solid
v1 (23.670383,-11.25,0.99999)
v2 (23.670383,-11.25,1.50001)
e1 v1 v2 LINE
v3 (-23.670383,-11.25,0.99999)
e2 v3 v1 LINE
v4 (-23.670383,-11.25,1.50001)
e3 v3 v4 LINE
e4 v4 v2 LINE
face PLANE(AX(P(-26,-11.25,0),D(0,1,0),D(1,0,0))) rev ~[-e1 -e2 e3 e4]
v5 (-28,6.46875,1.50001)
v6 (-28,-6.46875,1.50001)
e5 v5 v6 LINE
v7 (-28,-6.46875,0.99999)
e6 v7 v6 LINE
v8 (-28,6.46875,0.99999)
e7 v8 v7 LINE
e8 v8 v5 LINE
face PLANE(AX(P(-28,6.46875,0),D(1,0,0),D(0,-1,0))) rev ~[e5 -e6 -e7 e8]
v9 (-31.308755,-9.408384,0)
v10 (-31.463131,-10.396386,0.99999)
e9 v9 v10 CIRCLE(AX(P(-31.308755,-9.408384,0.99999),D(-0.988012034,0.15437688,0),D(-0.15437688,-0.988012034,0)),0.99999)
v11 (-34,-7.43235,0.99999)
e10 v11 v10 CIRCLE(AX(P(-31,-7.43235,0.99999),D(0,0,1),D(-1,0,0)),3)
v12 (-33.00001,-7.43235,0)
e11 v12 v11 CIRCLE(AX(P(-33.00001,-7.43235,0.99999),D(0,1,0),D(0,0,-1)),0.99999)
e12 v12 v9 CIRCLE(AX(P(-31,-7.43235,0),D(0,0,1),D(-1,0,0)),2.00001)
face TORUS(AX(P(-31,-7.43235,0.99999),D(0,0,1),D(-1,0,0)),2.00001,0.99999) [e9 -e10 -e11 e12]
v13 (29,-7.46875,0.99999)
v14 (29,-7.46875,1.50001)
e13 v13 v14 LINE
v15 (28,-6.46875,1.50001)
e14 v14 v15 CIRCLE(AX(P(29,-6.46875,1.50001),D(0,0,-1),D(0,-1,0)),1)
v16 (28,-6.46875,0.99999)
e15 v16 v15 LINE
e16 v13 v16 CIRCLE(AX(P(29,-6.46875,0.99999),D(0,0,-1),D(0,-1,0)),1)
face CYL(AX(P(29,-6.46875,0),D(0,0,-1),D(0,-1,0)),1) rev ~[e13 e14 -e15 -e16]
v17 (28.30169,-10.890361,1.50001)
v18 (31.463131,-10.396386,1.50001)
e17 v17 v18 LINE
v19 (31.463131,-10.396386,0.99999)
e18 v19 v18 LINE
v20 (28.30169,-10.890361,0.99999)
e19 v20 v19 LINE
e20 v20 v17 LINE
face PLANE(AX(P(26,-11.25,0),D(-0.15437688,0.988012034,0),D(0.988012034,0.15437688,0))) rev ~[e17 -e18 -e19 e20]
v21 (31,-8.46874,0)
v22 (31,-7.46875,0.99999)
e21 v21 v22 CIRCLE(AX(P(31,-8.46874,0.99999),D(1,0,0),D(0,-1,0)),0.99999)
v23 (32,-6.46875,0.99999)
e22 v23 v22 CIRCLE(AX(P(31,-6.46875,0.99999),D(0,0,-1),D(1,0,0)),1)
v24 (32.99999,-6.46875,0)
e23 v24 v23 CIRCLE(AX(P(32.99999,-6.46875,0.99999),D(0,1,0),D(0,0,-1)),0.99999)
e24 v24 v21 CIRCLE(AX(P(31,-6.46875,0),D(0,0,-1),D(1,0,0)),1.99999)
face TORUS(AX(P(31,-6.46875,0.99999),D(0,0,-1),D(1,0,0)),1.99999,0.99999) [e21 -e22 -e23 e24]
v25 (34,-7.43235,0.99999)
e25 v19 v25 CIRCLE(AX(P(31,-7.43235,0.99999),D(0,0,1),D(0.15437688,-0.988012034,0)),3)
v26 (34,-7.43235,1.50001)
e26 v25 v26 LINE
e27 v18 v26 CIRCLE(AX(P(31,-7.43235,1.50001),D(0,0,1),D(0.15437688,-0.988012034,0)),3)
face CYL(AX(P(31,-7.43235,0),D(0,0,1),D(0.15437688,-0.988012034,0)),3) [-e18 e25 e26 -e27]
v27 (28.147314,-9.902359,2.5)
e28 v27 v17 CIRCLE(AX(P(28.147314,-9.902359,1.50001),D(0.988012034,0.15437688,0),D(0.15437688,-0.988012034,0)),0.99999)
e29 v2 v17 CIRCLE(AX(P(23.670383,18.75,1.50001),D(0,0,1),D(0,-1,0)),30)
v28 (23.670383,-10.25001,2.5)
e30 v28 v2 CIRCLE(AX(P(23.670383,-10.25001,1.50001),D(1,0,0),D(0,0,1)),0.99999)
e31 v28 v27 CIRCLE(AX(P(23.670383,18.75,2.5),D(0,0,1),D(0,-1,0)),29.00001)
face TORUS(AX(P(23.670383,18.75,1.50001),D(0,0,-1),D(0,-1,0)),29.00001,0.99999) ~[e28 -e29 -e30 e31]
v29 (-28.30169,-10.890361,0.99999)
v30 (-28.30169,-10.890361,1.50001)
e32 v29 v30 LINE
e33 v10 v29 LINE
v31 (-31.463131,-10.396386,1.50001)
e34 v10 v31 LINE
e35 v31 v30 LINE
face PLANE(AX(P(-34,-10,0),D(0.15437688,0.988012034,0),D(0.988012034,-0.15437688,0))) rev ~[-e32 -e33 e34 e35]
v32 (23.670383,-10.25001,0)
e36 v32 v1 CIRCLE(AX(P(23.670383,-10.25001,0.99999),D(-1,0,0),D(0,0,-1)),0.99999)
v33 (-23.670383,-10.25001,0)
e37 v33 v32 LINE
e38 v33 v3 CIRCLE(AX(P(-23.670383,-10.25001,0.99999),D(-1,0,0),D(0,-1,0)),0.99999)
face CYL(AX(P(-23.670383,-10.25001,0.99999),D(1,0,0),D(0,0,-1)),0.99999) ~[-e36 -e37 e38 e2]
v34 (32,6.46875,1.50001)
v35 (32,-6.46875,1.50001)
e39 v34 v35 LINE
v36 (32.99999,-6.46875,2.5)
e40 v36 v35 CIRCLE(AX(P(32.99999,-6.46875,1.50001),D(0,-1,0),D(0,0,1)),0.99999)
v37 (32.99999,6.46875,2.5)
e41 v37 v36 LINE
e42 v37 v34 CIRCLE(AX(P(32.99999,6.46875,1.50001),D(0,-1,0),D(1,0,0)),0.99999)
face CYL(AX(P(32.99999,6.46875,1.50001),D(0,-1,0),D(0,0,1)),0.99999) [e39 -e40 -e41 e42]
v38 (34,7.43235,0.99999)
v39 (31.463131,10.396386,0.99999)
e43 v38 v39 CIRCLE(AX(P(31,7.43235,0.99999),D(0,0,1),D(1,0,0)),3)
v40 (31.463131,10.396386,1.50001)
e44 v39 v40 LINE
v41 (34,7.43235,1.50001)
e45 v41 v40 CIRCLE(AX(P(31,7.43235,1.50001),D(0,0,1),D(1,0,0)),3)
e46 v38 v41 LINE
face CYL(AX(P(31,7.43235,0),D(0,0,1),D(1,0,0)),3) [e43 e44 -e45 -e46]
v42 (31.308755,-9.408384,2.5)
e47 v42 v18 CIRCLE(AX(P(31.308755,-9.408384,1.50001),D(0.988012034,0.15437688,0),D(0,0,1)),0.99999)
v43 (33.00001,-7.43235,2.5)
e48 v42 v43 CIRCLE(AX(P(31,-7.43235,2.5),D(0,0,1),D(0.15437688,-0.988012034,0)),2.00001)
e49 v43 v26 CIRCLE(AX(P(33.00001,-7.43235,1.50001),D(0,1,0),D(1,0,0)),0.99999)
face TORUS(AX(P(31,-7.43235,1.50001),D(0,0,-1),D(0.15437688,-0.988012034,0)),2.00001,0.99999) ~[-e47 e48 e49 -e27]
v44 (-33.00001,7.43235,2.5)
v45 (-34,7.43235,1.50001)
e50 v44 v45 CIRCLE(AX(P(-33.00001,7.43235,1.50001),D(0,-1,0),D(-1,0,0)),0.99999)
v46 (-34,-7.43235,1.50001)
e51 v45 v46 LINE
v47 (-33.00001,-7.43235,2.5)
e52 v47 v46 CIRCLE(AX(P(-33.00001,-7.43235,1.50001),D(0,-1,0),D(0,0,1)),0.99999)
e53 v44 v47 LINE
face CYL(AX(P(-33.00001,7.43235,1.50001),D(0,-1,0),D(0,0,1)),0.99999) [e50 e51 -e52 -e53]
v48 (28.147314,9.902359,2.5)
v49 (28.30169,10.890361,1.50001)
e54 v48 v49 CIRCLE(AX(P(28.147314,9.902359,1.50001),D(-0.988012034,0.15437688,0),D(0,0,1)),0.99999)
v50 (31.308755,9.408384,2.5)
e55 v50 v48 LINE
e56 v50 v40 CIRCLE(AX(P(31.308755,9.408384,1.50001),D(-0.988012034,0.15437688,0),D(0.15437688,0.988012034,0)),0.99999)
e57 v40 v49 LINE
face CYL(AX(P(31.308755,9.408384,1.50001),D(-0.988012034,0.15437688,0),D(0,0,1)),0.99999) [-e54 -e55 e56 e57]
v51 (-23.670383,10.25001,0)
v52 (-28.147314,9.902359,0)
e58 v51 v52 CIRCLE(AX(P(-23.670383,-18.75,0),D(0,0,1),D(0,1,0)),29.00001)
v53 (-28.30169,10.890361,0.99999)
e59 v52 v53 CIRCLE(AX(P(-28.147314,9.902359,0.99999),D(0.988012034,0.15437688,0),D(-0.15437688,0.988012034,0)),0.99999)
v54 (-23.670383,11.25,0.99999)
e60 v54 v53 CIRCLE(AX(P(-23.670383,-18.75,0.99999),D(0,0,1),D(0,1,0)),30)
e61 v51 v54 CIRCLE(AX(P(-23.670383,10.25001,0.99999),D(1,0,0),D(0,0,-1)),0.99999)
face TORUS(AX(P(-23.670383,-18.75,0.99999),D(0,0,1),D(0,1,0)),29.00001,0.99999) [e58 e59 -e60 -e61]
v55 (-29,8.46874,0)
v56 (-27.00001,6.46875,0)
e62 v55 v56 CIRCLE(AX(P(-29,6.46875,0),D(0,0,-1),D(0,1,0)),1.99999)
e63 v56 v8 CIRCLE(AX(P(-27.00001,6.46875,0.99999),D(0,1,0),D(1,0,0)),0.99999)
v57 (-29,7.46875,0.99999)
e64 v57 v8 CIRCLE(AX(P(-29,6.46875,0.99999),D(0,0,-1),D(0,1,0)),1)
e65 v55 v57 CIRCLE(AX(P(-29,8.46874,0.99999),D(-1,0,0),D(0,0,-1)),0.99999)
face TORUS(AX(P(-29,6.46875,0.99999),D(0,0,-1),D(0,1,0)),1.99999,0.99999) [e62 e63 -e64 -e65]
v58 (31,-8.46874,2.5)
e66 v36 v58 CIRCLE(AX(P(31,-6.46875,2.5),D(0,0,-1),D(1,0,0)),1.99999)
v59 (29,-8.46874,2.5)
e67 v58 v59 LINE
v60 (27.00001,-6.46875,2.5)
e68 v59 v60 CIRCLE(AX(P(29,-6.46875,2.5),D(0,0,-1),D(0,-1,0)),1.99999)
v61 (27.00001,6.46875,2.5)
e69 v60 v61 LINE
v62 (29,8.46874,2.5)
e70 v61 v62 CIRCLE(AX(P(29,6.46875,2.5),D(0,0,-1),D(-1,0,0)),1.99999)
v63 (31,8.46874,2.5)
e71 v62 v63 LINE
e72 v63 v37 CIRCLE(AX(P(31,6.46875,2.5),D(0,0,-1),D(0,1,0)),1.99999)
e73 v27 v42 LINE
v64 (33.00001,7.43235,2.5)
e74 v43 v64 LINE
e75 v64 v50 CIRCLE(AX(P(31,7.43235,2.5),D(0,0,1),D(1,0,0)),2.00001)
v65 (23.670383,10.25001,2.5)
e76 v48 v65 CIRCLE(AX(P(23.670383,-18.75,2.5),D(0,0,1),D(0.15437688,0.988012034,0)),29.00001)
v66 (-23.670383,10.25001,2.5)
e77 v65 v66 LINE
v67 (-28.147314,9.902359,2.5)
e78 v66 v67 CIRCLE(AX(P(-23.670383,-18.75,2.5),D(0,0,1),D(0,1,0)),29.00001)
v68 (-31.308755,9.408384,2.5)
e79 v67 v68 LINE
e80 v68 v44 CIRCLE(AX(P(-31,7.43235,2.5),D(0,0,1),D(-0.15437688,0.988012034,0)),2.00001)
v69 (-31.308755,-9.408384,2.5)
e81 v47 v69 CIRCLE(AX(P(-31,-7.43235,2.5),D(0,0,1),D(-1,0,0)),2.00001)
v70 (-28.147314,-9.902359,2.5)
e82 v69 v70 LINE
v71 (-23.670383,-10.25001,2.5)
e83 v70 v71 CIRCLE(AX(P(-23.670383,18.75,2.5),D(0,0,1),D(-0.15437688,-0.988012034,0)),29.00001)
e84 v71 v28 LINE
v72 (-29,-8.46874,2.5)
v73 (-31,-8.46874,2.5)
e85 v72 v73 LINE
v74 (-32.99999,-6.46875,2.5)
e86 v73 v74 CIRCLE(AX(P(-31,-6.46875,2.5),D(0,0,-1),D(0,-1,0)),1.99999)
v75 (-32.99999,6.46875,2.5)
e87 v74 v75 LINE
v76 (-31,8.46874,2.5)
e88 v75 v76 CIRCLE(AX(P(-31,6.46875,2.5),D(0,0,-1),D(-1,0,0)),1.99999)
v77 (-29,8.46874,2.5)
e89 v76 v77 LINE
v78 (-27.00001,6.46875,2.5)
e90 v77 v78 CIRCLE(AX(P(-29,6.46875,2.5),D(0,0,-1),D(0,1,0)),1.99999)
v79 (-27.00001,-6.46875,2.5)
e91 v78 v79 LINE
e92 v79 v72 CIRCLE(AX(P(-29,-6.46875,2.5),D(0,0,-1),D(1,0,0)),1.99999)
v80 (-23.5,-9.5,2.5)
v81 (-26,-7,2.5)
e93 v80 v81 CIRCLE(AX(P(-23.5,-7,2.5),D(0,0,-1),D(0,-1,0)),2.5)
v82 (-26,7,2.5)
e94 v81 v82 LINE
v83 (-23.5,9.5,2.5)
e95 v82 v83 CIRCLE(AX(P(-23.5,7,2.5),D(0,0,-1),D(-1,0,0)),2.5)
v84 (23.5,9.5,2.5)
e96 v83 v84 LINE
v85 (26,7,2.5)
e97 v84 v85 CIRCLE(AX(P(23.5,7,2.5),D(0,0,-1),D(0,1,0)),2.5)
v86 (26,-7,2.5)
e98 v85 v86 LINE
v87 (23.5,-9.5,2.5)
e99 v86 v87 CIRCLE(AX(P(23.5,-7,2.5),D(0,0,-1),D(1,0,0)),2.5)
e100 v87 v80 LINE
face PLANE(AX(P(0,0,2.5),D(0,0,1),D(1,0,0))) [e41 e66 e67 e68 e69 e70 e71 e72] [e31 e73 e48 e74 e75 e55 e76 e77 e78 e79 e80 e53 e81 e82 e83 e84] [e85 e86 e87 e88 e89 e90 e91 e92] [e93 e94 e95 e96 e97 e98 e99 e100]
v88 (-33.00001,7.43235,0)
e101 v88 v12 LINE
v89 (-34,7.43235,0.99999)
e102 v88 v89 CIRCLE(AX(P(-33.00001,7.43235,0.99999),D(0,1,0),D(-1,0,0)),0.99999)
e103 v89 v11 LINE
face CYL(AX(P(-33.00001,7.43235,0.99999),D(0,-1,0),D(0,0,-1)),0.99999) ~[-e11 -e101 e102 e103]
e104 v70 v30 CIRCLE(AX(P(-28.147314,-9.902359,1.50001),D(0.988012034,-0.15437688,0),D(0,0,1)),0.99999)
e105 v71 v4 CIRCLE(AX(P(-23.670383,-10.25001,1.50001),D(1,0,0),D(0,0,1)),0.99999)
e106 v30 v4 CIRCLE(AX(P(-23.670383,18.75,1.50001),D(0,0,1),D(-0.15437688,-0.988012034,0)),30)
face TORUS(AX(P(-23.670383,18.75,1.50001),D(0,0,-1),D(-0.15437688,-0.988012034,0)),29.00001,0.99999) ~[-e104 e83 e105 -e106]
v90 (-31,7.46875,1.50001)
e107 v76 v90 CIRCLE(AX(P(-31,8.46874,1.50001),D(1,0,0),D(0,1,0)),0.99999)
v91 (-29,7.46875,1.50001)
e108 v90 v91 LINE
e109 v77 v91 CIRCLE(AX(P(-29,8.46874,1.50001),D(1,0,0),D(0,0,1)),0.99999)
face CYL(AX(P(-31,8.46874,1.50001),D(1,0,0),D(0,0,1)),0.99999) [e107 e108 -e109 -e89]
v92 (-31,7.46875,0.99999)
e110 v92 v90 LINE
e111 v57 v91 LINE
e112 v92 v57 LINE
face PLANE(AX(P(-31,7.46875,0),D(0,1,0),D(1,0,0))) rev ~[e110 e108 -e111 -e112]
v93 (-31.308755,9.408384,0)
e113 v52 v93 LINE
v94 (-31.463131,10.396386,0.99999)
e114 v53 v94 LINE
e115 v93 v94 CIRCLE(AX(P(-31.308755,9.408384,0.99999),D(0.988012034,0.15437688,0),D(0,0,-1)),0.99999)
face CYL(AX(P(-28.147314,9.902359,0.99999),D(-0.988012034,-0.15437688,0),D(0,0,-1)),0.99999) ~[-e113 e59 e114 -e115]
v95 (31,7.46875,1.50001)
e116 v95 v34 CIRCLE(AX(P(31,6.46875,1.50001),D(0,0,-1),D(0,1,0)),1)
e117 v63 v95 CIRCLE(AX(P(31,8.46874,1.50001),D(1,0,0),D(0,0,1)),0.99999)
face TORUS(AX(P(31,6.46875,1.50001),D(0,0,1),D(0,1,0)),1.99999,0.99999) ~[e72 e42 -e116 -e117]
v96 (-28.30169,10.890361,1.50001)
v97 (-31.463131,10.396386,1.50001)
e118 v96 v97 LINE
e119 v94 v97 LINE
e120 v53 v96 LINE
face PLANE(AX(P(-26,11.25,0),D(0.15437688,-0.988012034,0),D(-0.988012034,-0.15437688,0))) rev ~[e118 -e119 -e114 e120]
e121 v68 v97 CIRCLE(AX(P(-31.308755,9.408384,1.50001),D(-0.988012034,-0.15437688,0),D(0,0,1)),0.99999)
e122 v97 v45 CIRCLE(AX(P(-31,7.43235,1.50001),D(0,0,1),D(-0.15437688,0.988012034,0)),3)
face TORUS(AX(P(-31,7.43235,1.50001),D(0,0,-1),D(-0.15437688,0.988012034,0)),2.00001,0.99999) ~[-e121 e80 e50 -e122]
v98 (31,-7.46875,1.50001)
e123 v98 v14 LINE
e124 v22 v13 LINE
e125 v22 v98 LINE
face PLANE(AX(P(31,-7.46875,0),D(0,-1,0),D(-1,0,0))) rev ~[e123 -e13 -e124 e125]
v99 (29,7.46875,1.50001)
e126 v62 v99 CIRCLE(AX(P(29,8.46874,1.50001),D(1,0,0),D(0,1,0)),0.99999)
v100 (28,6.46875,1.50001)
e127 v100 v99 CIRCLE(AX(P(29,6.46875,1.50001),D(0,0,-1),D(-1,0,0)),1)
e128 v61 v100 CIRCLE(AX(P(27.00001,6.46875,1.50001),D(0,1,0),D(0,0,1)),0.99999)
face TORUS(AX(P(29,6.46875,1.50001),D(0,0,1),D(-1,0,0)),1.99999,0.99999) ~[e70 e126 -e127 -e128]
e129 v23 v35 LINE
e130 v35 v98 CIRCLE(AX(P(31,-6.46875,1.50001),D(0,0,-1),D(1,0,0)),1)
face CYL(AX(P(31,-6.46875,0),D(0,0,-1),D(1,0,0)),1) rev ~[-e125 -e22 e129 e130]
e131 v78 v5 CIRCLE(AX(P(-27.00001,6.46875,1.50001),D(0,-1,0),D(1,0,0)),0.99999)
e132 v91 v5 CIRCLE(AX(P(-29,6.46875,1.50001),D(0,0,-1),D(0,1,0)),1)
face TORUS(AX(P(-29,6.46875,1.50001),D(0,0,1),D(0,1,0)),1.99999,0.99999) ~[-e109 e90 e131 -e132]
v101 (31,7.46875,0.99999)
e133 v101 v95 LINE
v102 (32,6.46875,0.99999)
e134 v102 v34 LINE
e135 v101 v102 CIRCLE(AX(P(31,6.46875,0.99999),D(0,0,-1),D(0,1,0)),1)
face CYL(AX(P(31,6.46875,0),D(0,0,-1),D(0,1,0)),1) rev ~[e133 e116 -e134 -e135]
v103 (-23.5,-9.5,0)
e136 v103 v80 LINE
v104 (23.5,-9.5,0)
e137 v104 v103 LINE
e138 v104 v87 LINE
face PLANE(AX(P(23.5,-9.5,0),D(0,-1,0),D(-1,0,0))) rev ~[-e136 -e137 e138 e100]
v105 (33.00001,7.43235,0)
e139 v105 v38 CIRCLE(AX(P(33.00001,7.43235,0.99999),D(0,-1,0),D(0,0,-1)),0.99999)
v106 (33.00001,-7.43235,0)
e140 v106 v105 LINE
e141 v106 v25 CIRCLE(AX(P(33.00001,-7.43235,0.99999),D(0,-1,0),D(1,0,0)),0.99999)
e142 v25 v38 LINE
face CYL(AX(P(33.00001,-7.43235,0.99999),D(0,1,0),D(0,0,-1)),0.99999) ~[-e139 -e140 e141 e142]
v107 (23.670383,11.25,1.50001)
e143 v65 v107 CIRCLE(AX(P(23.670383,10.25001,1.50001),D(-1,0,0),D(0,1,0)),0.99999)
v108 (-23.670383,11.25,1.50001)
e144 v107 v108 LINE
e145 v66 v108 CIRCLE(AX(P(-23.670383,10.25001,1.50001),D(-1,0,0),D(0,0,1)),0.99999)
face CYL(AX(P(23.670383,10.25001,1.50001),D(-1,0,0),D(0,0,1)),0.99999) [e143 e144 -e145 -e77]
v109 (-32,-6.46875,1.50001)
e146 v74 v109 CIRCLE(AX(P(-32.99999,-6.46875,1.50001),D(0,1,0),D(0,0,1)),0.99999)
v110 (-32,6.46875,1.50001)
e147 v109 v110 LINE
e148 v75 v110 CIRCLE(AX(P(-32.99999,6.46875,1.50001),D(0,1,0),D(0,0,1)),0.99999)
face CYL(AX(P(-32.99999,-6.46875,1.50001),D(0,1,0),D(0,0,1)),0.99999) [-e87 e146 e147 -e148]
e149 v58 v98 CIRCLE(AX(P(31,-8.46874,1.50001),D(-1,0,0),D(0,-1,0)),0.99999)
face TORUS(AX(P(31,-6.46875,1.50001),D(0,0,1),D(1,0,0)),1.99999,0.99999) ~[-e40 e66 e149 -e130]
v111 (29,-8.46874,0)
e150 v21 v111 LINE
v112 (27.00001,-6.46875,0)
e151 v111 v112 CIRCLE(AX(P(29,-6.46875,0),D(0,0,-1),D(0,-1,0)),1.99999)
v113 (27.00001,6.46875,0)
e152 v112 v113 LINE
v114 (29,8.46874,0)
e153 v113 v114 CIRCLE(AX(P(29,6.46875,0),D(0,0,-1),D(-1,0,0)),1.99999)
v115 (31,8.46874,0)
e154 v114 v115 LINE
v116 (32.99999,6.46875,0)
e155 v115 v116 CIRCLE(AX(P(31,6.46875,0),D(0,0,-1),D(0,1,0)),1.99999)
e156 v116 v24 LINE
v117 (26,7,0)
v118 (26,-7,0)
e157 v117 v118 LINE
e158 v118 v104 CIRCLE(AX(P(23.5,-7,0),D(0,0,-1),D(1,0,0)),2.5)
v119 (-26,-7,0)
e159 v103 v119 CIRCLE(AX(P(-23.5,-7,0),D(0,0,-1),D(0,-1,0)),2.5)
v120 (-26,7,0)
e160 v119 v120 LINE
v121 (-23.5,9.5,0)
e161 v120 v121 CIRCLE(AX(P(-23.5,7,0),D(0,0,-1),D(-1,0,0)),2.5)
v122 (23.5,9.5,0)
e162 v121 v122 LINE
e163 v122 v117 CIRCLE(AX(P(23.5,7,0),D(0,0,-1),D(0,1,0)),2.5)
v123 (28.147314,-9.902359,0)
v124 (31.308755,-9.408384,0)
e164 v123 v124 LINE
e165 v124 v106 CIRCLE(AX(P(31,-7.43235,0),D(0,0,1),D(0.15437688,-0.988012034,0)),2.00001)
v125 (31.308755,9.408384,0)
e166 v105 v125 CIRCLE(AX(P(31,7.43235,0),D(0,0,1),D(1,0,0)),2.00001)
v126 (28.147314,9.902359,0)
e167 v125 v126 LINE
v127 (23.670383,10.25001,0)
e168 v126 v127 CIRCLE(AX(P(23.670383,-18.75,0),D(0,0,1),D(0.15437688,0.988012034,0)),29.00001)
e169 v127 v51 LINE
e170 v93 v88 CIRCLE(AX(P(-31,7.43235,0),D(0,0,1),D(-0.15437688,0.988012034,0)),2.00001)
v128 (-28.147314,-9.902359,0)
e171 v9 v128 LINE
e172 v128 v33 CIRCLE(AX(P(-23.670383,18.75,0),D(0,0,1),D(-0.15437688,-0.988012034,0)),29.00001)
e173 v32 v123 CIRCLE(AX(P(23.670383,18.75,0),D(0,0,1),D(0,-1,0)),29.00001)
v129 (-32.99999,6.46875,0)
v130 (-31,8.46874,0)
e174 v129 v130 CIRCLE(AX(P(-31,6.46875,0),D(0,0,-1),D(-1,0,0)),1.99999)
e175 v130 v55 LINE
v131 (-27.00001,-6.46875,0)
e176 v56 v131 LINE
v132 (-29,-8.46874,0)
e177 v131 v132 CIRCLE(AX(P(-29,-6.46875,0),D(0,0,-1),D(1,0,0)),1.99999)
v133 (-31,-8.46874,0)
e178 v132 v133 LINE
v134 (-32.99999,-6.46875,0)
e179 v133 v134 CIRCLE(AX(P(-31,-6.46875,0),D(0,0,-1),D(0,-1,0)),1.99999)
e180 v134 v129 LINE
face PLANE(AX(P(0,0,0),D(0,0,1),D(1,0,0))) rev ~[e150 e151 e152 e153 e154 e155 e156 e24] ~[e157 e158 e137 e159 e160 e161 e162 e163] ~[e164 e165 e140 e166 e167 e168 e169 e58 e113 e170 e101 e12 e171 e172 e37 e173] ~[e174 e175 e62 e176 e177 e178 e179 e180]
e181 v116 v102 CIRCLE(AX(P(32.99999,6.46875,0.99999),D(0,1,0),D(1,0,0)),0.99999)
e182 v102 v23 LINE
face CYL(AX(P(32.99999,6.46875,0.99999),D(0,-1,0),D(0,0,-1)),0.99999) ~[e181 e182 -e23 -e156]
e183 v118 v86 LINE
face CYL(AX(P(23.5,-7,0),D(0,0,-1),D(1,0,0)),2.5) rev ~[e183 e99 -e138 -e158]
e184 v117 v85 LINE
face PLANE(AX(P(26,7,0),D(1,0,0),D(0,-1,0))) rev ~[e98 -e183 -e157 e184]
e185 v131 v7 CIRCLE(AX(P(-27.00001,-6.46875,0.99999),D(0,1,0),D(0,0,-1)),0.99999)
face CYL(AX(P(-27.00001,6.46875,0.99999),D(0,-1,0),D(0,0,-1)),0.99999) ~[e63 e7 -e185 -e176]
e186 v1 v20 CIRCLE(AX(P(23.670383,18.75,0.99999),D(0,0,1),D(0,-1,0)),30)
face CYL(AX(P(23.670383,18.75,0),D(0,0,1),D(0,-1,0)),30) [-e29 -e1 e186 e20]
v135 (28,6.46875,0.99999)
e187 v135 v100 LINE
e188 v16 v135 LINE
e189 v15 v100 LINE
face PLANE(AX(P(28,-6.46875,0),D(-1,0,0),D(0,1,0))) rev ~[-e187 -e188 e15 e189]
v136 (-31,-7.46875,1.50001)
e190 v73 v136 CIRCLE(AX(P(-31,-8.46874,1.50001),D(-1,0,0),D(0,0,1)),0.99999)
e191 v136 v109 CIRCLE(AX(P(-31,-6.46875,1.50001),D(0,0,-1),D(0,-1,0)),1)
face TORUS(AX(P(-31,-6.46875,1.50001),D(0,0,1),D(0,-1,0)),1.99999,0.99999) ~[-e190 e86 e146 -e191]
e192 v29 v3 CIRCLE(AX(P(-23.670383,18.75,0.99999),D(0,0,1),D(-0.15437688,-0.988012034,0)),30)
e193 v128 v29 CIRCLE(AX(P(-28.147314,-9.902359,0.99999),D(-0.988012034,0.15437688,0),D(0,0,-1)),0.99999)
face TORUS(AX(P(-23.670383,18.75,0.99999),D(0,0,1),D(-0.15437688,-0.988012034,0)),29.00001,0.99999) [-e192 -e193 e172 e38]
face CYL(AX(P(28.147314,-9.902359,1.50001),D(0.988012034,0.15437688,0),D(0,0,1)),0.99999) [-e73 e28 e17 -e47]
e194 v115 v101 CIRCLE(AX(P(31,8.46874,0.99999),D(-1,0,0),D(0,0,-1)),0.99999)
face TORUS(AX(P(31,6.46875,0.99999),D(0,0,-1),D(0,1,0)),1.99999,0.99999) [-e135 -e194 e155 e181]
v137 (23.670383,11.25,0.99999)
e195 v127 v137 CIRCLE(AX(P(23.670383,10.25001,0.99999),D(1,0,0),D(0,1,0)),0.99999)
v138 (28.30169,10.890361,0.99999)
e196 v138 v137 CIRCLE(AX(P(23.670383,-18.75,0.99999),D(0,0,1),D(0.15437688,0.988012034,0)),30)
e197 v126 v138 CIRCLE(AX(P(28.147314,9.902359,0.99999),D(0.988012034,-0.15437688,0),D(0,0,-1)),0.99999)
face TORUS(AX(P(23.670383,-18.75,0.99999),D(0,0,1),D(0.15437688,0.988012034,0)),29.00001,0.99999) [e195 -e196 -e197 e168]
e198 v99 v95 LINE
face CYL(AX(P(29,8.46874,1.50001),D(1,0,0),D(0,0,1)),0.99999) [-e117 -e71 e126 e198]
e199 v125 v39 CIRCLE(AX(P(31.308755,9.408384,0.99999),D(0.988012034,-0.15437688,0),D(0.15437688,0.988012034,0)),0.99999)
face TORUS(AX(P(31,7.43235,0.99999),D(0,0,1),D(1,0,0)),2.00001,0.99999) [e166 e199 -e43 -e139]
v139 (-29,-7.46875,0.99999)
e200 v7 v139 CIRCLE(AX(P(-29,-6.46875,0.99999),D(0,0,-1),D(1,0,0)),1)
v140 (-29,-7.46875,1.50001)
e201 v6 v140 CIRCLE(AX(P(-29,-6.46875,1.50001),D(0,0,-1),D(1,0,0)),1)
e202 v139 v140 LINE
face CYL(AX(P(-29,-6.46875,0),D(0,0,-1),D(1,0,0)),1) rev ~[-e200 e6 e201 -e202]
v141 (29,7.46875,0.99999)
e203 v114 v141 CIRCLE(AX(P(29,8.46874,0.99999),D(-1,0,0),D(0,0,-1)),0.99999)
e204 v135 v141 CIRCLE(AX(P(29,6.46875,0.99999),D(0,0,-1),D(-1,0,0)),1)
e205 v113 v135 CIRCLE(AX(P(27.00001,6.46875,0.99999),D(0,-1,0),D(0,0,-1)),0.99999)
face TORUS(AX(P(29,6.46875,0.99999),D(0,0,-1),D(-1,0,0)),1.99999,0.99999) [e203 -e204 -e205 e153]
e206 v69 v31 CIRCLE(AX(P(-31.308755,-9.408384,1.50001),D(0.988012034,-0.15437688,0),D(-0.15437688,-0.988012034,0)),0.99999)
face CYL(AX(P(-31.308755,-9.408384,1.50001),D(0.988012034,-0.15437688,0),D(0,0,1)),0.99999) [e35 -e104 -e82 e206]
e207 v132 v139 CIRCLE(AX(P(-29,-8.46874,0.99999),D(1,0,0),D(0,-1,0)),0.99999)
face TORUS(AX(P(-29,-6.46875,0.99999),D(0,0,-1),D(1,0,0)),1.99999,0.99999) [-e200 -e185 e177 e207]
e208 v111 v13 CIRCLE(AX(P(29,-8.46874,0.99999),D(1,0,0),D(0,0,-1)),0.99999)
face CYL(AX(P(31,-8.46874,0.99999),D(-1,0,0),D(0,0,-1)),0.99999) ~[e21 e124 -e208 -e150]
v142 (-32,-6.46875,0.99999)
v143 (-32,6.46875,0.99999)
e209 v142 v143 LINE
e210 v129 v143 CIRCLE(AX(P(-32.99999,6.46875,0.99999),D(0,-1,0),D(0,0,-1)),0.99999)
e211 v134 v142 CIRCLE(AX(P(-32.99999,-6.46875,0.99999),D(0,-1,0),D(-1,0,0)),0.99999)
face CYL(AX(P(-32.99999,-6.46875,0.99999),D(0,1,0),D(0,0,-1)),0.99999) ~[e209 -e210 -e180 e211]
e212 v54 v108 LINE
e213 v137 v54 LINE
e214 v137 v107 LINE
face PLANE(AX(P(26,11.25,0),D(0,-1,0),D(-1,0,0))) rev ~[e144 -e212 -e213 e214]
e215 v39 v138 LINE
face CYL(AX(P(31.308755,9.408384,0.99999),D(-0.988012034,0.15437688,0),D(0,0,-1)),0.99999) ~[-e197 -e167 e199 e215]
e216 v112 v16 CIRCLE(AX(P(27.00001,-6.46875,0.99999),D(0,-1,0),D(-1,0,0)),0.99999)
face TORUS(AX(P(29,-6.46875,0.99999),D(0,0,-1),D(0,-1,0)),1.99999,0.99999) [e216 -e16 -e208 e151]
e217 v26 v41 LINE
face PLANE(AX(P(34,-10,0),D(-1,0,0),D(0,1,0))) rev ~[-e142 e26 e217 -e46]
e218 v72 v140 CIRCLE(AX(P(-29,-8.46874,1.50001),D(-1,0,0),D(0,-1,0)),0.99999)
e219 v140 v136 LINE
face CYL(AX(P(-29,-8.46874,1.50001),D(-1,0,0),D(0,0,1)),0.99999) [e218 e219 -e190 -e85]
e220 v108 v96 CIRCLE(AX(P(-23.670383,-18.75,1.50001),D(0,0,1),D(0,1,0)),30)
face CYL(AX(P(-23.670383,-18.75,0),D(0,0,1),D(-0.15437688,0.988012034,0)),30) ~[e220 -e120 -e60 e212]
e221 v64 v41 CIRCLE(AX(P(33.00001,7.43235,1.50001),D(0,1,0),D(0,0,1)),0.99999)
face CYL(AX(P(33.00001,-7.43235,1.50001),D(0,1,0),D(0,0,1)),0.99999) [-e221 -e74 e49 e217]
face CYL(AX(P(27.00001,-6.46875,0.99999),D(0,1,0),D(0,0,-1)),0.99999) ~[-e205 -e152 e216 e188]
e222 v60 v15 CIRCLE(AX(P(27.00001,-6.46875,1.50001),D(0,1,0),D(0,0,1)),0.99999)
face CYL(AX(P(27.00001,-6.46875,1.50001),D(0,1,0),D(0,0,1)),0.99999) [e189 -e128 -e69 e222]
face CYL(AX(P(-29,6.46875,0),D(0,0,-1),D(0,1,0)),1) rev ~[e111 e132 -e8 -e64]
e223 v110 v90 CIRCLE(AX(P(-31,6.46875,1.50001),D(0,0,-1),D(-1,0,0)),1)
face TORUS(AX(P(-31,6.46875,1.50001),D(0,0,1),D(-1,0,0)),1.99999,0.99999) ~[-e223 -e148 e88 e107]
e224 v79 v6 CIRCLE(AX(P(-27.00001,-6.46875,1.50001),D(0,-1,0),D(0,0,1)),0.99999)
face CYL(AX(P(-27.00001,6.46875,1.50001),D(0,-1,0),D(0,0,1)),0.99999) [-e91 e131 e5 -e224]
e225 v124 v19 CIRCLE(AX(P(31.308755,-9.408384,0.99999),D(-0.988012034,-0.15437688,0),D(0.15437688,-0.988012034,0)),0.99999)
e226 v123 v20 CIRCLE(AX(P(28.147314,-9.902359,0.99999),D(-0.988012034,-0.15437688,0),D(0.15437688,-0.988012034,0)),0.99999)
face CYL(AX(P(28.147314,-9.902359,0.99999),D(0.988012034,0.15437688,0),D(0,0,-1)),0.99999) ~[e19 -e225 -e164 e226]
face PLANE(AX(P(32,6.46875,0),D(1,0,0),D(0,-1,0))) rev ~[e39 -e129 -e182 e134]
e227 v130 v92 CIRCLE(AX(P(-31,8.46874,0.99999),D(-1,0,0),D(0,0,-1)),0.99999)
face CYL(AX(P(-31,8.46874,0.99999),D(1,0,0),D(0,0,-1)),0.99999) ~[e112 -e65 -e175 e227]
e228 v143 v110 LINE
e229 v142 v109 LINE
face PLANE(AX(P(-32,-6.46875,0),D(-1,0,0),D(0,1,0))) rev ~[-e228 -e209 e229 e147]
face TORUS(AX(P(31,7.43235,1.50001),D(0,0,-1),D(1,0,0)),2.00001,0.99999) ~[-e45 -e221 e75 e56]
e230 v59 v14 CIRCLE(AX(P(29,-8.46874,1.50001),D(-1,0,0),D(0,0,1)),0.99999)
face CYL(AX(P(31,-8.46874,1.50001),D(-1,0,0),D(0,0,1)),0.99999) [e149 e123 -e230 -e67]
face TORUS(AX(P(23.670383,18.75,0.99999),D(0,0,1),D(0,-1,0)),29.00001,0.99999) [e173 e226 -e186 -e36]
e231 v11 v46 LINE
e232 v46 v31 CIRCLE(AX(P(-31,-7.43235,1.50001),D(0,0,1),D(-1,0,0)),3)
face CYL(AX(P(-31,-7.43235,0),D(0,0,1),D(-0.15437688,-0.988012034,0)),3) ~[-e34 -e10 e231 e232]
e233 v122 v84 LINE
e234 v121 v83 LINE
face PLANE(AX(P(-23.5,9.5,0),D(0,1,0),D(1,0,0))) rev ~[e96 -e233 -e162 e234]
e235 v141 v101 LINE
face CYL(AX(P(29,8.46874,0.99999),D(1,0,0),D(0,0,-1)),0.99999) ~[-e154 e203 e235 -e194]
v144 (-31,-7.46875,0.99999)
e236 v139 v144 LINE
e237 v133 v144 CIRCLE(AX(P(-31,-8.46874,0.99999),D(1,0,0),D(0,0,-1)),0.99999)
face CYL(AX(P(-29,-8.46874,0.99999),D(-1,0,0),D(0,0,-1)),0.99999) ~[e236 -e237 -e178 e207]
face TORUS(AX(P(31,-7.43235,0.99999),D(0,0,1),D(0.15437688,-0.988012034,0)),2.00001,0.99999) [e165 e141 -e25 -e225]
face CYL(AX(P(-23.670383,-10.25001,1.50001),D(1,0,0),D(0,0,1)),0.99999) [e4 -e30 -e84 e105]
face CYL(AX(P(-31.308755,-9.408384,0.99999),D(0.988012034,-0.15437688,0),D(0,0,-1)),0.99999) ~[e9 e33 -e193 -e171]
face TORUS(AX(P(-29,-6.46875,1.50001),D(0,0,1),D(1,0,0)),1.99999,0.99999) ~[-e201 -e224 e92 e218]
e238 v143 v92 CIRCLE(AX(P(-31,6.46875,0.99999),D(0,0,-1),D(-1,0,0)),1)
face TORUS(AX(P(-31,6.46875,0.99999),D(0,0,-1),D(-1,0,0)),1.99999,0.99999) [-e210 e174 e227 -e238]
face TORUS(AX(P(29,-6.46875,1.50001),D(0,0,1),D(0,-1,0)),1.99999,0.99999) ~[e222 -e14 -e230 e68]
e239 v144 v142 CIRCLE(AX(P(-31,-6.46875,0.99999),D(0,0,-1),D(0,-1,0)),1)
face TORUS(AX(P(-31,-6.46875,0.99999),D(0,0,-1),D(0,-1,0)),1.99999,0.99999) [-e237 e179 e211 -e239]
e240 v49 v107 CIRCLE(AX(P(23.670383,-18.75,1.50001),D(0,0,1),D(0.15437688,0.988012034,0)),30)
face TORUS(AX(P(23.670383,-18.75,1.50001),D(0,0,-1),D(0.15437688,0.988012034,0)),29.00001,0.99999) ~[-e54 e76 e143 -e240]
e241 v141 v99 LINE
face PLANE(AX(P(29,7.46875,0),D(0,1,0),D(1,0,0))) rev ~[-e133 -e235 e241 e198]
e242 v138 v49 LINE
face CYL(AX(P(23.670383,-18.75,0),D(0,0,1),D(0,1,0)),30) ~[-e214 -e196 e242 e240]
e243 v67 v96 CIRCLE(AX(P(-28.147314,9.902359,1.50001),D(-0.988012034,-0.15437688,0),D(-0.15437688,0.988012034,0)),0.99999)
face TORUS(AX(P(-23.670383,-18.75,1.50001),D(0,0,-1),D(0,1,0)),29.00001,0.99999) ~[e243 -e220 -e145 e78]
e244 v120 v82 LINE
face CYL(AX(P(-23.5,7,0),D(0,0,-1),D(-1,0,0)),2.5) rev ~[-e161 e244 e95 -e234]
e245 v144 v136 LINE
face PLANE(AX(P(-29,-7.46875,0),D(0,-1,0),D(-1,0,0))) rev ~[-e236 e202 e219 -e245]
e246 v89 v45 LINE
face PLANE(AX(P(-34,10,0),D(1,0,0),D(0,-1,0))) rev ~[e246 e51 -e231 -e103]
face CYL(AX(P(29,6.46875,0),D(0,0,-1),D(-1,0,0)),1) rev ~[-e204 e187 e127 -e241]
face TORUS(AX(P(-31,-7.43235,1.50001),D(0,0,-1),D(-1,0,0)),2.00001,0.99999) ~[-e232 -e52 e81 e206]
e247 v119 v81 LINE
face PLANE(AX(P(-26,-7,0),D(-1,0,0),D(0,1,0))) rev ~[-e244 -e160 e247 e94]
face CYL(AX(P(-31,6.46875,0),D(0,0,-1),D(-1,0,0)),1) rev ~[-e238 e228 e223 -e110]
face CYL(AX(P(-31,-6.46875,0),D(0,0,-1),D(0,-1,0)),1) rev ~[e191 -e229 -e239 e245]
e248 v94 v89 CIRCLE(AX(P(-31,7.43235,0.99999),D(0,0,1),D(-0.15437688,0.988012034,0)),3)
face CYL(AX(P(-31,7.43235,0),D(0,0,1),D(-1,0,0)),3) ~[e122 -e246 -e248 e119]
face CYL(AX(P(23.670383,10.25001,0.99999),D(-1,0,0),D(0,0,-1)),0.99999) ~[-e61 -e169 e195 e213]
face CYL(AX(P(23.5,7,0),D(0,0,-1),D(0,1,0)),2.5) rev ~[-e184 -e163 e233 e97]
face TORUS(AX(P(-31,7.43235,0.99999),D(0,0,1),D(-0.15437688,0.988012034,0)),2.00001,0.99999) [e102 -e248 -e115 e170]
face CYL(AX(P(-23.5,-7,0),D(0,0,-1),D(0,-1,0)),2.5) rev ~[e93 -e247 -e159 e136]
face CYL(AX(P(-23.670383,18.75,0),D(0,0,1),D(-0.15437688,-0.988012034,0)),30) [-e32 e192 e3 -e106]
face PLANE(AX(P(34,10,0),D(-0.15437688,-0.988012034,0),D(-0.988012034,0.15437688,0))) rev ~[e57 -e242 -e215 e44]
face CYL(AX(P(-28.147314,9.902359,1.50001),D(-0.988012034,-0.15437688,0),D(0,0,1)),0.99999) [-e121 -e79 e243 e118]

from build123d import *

# Parameters (mm, degrees)
F1_DEPTH = 2.5
F2_R     = 3
F3_R     = 30
F4_R     = 0.99999


# Not quite as in the source:
# - a fillet or chamfer is up to 0.001 mm smaller than in the source, because OpenCascade refuses the exact size


with BuildPart() as f1:
    # F0 (on Top) → F1 (new body)
    with BuildSketch(Plane.XY):
        Polygon((-26, -11.25), (26, -11.25), (34, -10), (34, 10), (26, 11.25), (-26, 11.25), (-34, 10), (-34, -10), align=None)
        with BuildLine():
            Line((-32, -6.46875), (-32, 6.46875))
            ThreePointArc((-32, 6.46875), (-31.7071067812, 7.1758567812), (-31, 7.46875))
            Line((-31, 7.46875), (-29, 7.46875))
            ThreePointArc((-29, 7.46875), (-28.2928932188, 7.1758567812), (-28, 6.46875))
            Line((-28, 6.46875), (-28, -6.46875))
            ThreePointArc((-28, -6.46875), (-28.2928932188, -7.1758567812), (-29, -7.46875))
            Line((-29, -7.46875), (-31, -7.46875))
            ThreePointArc((-31, -7.46875), (-31.7071067812, -7.1758567812), (-32, -6.46875))
        make_face(mode=Mode.SUBTRACT)
        with BuildLine():
            Line((-23.5, 9.5), (23.5, 9.5))
            ThreePointArc((23.5, 9.5), (25.267766953, 8.767766953), (26, 7))
            Line((26, 7), (26, -7))
            ThreePointArc((26, -7), (25.267766953, -8.767766953), (23.5, -9.5))
            Line((23.5, -9.5), (-23.5, -9.5))
            ThreePointArc((-23.5, -9.5), (-25.267766953, -8.767766953), (-26, -7))
            Line((-26, -7), (-26, 7))
            ThreePointArc((-26, 7), (-25.267766953, 8.767766953), (-23.5, 9.5))
        make_face(mode=Mode.SUBTRACT)
        with BuildLine():
            ThreePointArc((32, -6.46875), (31.7071067812, -7.1758567812), (31, -7.46875))
            Line((31, -7.46875), (29, -7.46875))
            ThreePointArc((29, -7.46875), (28.2928932188, -7.1758567812), (28, -6.46875))
            Line((28, -6.46875), (28, 6.46875))
            ThreePointArc((28, 6.46875), (28.2928932188, 7.1758567812), (29, 7.46875))
            Line((29, 7.46875), (31, 7.46875))
            ThreePointArc((31, 7.46875), (31.7071067812, 7.1758567812), (32, 6.46875))
            Line((32, 6.46875), (32, -6.46875))
        make_face(mode=Mode.SUBTRACT)
    extrude(amount=F1_DEPTH)

    # F2
    f2_edges = [f1.edges().sort_by_distance(p)[0] for p in [
        (34, -10, 1.25),
        (34, 10, 1.25),
        (-34, -10, 1.25),
        (-34, 10, 1.25),
    ]]
    fillet(f2_edges, radius=F2_R)

    # F3
    f3_edges = [f1.edges().sort_by_distance(p)[0] for p in [
        (-26, -11.25, 1.25),
        (26, -11.25, 1.25),
        (-26, 11.25, 1.25),
        (26, 11.25, 1.25),
    ]]
    fillet(f3_edges, radius=F3_R)

    # F4 (radius 1 in the source; OpenCascade refuses exactly that, so slightly less here)
    f4_edges = [f1.edges().sort_by_distance(p)[0] for p in [
        (0, -11.25, 2.5),
        (28, 0, 2.5),
        (-32, 0, 2.5),
        (-30, 7.46875, 0),
        (30, 7.46875, 0),
        (33.279188, -9.383069, 0),
    ]]
    fillet(f4_edges, radius=F4_R)


solid = f1.part
